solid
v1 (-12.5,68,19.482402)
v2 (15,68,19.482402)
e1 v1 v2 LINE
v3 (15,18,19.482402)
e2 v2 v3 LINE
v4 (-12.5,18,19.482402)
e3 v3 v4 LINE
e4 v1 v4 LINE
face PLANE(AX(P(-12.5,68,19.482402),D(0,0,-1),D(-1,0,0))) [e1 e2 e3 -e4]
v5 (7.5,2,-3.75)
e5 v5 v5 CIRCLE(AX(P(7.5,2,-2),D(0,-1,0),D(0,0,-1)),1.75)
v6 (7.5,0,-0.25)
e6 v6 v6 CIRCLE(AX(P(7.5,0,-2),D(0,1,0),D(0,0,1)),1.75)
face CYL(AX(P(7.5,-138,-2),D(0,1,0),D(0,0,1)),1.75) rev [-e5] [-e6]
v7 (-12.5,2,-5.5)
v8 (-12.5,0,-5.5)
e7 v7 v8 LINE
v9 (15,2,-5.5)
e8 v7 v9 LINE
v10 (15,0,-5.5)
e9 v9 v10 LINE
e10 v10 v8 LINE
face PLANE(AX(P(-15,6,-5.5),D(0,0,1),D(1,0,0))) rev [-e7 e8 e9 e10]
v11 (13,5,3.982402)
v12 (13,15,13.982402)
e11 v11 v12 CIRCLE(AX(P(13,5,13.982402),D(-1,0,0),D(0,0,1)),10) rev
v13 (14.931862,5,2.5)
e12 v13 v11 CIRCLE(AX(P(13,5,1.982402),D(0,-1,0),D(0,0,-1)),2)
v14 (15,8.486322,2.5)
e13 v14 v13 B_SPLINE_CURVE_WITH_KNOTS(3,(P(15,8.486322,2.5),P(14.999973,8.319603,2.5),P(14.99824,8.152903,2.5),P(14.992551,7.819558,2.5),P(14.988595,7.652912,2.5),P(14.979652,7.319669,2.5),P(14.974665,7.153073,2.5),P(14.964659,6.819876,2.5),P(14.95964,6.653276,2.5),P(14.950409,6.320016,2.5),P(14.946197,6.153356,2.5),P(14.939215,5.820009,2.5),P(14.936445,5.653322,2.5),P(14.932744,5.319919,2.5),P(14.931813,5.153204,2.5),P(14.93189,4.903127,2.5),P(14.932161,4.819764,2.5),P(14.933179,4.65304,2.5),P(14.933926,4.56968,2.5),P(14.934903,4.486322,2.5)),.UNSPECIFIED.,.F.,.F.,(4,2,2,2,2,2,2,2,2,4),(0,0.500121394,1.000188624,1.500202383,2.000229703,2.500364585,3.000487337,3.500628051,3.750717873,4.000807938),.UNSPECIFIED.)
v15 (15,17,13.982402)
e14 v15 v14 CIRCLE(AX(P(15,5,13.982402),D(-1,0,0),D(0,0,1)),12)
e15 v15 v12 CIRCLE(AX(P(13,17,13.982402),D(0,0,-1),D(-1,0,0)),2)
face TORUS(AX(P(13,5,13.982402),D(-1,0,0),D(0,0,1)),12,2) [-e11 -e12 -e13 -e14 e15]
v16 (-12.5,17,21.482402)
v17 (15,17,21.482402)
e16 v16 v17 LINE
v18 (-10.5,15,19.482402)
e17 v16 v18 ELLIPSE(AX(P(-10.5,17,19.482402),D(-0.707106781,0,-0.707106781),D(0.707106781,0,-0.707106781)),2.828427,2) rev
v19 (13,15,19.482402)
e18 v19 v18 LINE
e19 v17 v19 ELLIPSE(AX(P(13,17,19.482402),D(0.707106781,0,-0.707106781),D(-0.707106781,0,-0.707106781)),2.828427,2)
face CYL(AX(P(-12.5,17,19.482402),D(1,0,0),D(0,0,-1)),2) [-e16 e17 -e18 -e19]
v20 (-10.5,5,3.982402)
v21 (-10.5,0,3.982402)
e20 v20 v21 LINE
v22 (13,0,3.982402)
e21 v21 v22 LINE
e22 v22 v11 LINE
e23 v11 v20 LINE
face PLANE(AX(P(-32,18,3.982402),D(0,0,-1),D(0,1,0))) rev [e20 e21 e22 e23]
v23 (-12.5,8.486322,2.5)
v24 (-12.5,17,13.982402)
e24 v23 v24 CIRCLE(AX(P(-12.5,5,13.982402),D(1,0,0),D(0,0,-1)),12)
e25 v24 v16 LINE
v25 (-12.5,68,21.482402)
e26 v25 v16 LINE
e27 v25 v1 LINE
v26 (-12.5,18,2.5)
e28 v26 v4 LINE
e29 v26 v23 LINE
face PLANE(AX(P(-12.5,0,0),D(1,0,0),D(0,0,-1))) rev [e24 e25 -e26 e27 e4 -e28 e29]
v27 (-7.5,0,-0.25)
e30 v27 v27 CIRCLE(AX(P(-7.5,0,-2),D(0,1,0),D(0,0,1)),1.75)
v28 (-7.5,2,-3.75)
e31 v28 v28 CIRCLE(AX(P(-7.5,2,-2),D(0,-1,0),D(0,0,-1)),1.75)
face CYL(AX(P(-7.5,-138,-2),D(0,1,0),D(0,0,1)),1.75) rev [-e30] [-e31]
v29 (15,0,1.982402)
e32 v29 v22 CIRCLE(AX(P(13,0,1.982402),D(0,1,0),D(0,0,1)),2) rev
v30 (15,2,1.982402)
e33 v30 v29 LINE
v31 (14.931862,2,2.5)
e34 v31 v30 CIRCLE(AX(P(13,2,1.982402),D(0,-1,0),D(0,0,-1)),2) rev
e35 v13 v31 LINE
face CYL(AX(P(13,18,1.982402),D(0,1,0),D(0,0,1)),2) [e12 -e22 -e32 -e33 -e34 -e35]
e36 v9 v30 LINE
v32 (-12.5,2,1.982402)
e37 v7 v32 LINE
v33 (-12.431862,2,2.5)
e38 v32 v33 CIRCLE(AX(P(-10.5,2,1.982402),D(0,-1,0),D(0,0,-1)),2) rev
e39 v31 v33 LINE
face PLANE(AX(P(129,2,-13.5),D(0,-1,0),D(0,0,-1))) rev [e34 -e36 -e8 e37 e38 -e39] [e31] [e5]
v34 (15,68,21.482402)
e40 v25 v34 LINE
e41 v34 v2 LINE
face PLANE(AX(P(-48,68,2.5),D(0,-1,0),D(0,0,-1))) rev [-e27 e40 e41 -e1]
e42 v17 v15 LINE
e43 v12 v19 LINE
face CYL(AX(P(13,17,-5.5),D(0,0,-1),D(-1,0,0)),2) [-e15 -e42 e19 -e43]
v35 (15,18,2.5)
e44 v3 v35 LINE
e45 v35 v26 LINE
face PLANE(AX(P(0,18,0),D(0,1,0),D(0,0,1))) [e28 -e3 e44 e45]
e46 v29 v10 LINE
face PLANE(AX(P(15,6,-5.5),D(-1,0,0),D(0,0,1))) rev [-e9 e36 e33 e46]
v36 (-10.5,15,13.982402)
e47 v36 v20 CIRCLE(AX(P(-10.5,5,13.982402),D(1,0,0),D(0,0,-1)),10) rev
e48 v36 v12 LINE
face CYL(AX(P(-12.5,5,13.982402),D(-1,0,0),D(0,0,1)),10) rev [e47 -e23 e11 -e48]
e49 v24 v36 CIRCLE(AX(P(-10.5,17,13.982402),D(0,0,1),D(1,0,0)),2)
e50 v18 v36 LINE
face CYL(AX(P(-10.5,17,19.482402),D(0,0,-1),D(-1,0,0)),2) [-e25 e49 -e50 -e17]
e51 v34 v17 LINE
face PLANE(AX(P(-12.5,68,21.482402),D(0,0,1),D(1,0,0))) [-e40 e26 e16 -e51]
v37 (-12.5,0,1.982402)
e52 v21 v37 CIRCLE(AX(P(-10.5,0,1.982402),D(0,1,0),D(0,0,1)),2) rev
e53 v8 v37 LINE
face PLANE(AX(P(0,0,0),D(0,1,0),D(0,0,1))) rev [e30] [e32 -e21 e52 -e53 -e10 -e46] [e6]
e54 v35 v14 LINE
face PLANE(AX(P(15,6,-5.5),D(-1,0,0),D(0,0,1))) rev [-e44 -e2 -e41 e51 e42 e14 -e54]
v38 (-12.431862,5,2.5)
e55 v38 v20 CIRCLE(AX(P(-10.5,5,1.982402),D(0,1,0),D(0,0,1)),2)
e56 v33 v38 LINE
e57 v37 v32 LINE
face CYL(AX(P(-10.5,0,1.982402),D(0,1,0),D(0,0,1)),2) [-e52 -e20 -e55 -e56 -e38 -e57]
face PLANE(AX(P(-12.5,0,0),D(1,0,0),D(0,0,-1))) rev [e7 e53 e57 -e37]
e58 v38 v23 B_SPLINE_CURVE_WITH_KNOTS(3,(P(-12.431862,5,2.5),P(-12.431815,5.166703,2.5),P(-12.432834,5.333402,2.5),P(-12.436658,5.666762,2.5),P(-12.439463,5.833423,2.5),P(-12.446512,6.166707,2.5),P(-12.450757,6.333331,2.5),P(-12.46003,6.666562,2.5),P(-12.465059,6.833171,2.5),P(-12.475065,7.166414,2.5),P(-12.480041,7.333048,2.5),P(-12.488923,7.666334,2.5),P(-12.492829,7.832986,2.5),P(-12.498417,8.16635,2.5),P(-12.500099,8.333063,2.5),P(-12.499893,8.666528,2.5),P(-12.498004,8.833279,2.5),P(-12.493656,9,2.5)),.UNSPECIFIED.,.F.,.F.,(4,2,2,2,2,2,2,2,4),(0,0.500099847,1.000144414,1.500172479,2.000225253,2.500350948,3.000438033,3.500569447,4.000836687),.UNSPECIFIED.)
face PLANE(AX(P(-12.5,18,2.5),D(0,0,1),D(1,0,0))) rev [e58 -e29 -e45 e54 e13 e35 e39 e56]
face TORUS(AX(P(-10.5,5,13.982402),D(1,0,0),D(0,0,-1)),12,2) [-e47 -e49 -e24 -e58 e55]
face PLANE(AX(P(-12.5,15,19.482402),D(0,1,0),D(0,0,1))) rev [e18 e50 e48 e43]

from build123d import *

# Parameters (mm, degrees)
SKETCH_1_W           = 30
SKETCH_1_H           = 11
EXTRUDE_1_DEPTH      = 6
SKETCH_2_W           = 16
SKETCH_2_H           = 2
CUT_EXTRUDE_1_DEPTH  = 144
EXTRUDE_2_DEPTH      = 50
SKETCH_4_R           = 1.75
CUT_EXTRUDE_2_DEPTH  = 144
SKETCH_5_W           = 11
SKETCH_5_H           = 56
CUT_EXTRUDE_3_DEPTH  = 2.5
SKETCH_7_W           = 11
SKETCH_7_H           = 54
CUT_EXTRUDE_5_DEPTH  = 47
EXTRUDE_3_DEPTH      = 16
EXTRUDE_3_DEPTH_BACK = 2
SKETCH_8_W           = 27.5
SKETCH_8_H           = 1.482402205
SKETCH_9_W           = 27.5
SKETCH_9_H           = 3
EXTRUDE_4_DEPTH      = 16
SKETCH_10_W          = 3
SKETCH_10_H          = 18
CUT_EXTRUDE_6_DEPTH  = 47
SKETCH_12_W          = 27.5
SKETCH_12_H          = 3
EXTRUDE_5_DEPTH      = 15.5
SKETCH_13_W          = 27.5
SKETCH_13_H          = 2
EXTRUDE_6_DEPTH      = 53
SKETCH_14_W          = 27.5
SKETCH_14_H          = 18.982402205
EXTRUDE_7_DEPTH      = 3
SKETCH_15_W          = 27.5
SKETCH_15_H          = 2
EXTRUDE_8_DEPTH      = 13
SKETCH_16_W          = 27.5
SKETCH_16_H          = 10
EXTRUDE_9_DEPTH      = 2
CUT_EXTRUDE_START    = -6
SKETCH_17_R          = 1.75
CUT_EXTRUDE_8_DEPTH  = 6
FILLET_1_R           = 10
FILLET_2_R           = 2
CUT_EXTRUDE_9_DEPTH  = 63
SKETCH_19_W          = 18.982402205
SKETCH_19_H          = 16.821441914
CUT_EXTRUDE_10_DEPTH = 63


with BuildPart() as part:
    # 草图1 → 凸台-拉伸1 (new body)
    with BuildSketch(Plane(origin=(0, 0, 0), x_dir=(1, 0, 0), z_dir=(0, 1, 0))):
        Rectangle(SKETCH_1_W, SKETCH_1_H)
    extrude(amount=EXTRUDE_1_DEPTH)

    # 草图2 → 切除-拉伸1 (cut)
    with BuildSketch(Plane.ZY.offset(15)):
        with Locations((-5.5, 3)):
            Rectangle(SKETCH_2_W, SKETCH_2_H)
    extrude(amount=-CUT_EXTRUDE_1_DEPTH, mode=Mode.SUBTRACT)

    # 草图3 → 凸台-拉伸2 (add)
    with BuildSketch(Plane(origin=(0, 6, 0), x_dir=(1, 0, 0), z_dir=(0, 1, 0))):
        Polygon((2, 5.5), (-2, 5.5), (-2, -3.5), (-15, -3.5), (-15, -5.5), (15, -5.5), (15, -3.5), (2, -3.5), align=None)
    extrude(amount=EXTRUDE_2_DEPTH)

    # 草图4 → 切除-拉伸2 (cut)
    with BuildSketch(Plane(origin=(0, 6, 0), x_dir=(1, 0, 0), z_dir=(0, 1, 0))):
        with Locations(Location((-7.5, 2, 0), (0, 0, 270))):
            Circle(SKETCH_4_R)
        with Locations(Location((7.5, 2, 0), (0, 0, 270))):
            Circle(SKETCH_4_R)
    extrude(amount=-CUT_EXTRUDE_2_DEPTH, mode=Mode.SUBTRACT)

    # 草图5 → 切除-拉伸3 (cut)
    with BuildSketch(Plane.ZY.offset(15)):
        with Locations((0, 28)):
            Rectangle(SKETCH_5_W, SKETCH_5_H)
    extrude(amount=-CUT_EXTRUDE_3_DEPTH, mode=Mode.SUBTRACT)

    # 草图7 → 切除-拉伸5 (cut)
    with BuildSketch(Plane.ZY.offset(12.5)):
        with Locations((0, 29)):
            Rectangle(SKETCH_7_W, SKETCH_7_H)
    extrude(amount=-CUT_EXTRUDE_5_DEPTH, mode=Mode.SUBTRACT)

    # 草图8 → 凸台-拉伸3 (add, two sides: drawn at the far end of the back side and taken through both)
    with BuildSketch(Plane(origin=(0, 2, 0), x_dir=(1, 0, 0), z_dir=(0, 1, 0)).offset(-EXTRUDE_3_DEPTH_BACK)):
        with Locations((1.25, -6.241201102)):
            Rectangle(SKETCH_8_W, SKETCH_8_H)
    extrude(amount=EXTRUDE_3_DEPTH + EXTRUDE_3_DEPTH_BACK)

    # 草图9 → 凸台-拉伸4 (add)
    with BuildSketch(Plane(origin=(0, 2, 0), x_dir=(1, 0, 0), z_dir=(0, 1, 0))):
        with Locations((1.25, -4)):
            Rectangle(SKETCH_9_W, SKETCH_9_H)
    extrude(amount=EXTRUDE_4_DEPTH)

    # 草图10 → 切除-拉伸6 (cut)
    with BuildSketch(Plane(origin=(15, 0, 0), x_dir=(0, 0, -1), z_dir=(1, 0, 0))):
        with Locations((-5.482402205, 9)):
            Rectangle(SKETCH_10_W, SKETCH_10_H)
    extrude(amount=-CUT_EXTRUDE_6_DEPTH, mode=Mode.SUBTRACT)

    # 草图12 → 凸台-拉伸5 (add)
    with BuildSketch(Plane.XY.offset(3.982402205)):
        with Locations((1.25, 16.5)):
            Rectangle(SKETCH_12_W, SKETCH_12_H)
    extrude(amount=EXTRUDE_5_DEPTH)

    # 草图13 → 凸台-拉伸6 (add)
    with BuildSketch(Plane(origin=(0, 15, 0), x_dir=(-1, 0, 0), z_dir=(0, -1, 0))):
        with Locations((-1.25, -20.482402205)):
            Rectangle(SKETCH_13_W, SKETCH_13_H)
    extrude(amount=-EXTRUDE_6_DEPTH)

    # 草图14 → 凸台-拉伸7 (add)
    with BuildSketch(Plane(origin=(0, 68, 0), x_dir=(1, 0, 0), z_dir=(0, 1, 0))):
        with Locations((1.25, -11.991201102)):
            Rectangle(SKETCH_14_W, SKETCH_14_H)
    extrude(amount=EXTRUDE_7_DEPTH)

    # 草图15 → 凸台-拉伸8 (add)
    with BuildSketch(Plane(origin=(0, 71, 0), x_dir=(1, 0, 0), z_dir=(0, 1, 0))):
        with Locations((1.25, -3.5)):
            Rectangle(SKETCH_15_W, SKETCH_15_H)
    extrude(amount=EXTRUDE_8_DEPTH)

    # 草图16 → 凸台-拉伸9 (add)
    with BuildSketch(Plane(origin=(0, 84, 0), x_dir=(1, 0, 0), z_dir=(0, 1, 0))):
        with Locations((1.25, 0.5)):
            Rectangle(SKETCH_16_W, SKETCH_16_H)
    extrude(amount=EXTRUDE_9_DEPTH)

    # 草图17 → 切除-拉伸8 (cut)
    with BuildSketch(Plane(origin=(0, 84, 0), x_dir=(-1, 0, 0), z_dir=(0, -1, 0)).offset(CUT_EXTRUDE_START)):
        with Locations(Location((7.5, 2, 0), (0, 0, 270))):
            Circle(SKETCH_17_R)
        with Locations(Location((-7.5, 2, 0), (0, 0, 270))):
            Circle(SKETCH_17_R)
    extrude(amount=CUT_EXTRUDE_8_DEPTH, mode=Mode.SUBTRACT)

    # 圆角1
    fillet_1_edges = [part.edges().sort_by_distance(p)[0] for p in [
        (1.25, 15, 3.982402205),
        (1.25, 71, 4.5),
    ]]
    fillet(fillet_1_edges, radius=FILLET_1_R)

    # 圆角2
    # the kernel refuses this fillet: 2 mm, written as the material it takes off along each edge
    with BuildSketch(Plane(origin=(-12.5, -5, 3.982402205), x_dir=(1, 0, 0), z_dir=(0, 1, 0)), Plane(origin=(-12.5, 81, 4.5), x_dir=(1, 0, 0), z_dir=(0, 1, 0))) as fillet_2_piece_1:
        with BuildLine():
            CenterArc((FILLET_2_R, FILLET_2_R), FILLET_2_R, 180, 90)
            Line((0, FILLET_2_R), (0, 0))
            Line((0, 0), (FILLET_2_R, 0))
        make_face()
    extrude(amount=10, mode=Mode.SUBTRACT)
    with BuildSketch(Plane(origin=(15, 5, 3.982402205), x_dir=(0, 0, -1), z_dir=(0, -1, 0)), Plane(origin=(15, 91, 4.5), x_dir=(0, 0, -1), z_dir=(0, -1, 0))) as fillet_2_piece_2:
        with BuildLine():
            CenterArc((FILLET_2_R, -FILLET_2_R), FILLET_2_R, 90, 90)
            Line((0, -FILLET_2_R), (0, 0))
            Line((0, 0), (FILLET_2_R, 0))
        make_face()
    extrude(amount=10, mode=Mode.SUBTRACT)
    with BuildSketch(Plane(origin=(-12.5, 15, 13.982402205), x_dir=(1, 0, 0), z_dir=(0, 0, 1))) as fillet_2_piece_3:
        with BuildLine():
            CenterArc((FILLET_2_R, FILLET_2_R), FILLET_2_R, 180, 90)
            Line((0, FILLET_2_R), (0, 0))
            Line((0, 0), (FILLET_2_R, 0))
        make_face()
    extrude(amount=12.5, mode=Mode.SUBTRACT)
    with BuildSketch(Plane(origin=(15, 15, 26.482402205), x_dir=(0, 1, 0), z_dir=(0, 0, -1))) as fillet_2_piece_4:
        with BuildLine():
            CenterArc((FILLET_2_R, -FILLET_2_R), FILLET_2_R, 90, 90)
            Line((0, -FILLET_2_R), (0, 0))
            Line((0, 0), (FILLET_2_R, 0))
        make_face()
    extrude(amount=12.5, mode=Mode.SUBTRACT)
    with BuildSketch(Plane(origin=(20, 15, 21.482402205), x_dir=(0, 1, 0), z_dir=(-1, 0, 0))) as fillet_2_piece_5:
        with BuildLine():
            CenterArc((FILLET_2_R, FILLET_2_R), FILLET_2_R, 180, 90)
            Line((0, FILLET_2_R), (0, 0))
            Line((0, 0), (FILLET_2_R, 0))
        make_face()
    extrude(amount=37.5, mode=Mode.SUBTRACT)
    with BuildSketch(Plane(origin=(-17.5, 71, 21.482402205), x_dir=(0, 0, -1), z_dir=(1, 0, 0))) as fillet_2_piece_6:
        with BuildLine():
            CenterArc((FILLET_2_R, -FILLET_2_R), FILLET_2_R, 90, 90)
            Line((0, -FILLET_2_R), (0, 0))
            Line((0, 0), (FILLET_2_R, 0))
        make_face()
    extrude(amount=37.5, mode=Mode.SUBTRACT)
    with BuildSketch(Plane(origin=(15, 71, 26.482402205), x_dir=(0, -1, 0), z_dir=(0, 0, -1))) as fillet_2_piece_7:
        with BuildLine():
            CenterArc((FILLET_2_R, FILLET_2_R), FILLET_2_R, 180, 90)
            Line((0, FILLET_2_R), (0, 0))
            Line((0, 0), (FILLET_2_R, 0))
        make_face()
    extrude(amount=11.982402205, mode=Mode.SUBTRACT)
    with BuildSketch(Plane(origin=(-12.5, 71, 14.5), x_dir=(1, 0, 0), z_dir=(0, 0, 1))) as fillet_2_piece_8:
        with BuildLine():
            CenterArc((FILLET_2_R, -FILLET_2_R), FILLET_2_R, 90, 90)
            Line((0, -FILLET_2_R), (0, 0))
            Line((0, 0), (FILLET_2_R, 0))
        make_face()
    extrude(amount=11.982402205, mode=Mode.SUBTRACT)
    with BuildSketch(Plane(origin=(15, 81, 14.5), x_dir=(0, 0, -1), z_dir=(0, 1, 0))) as fillet_2_piece_9:
        with BuildLine():
            CenterArc((10 + FILLET_2_R, FILLET_2_R), FILLET_2_R, 180, 90)
            Line((10, FILLET_2_R), (10, 0))
            Line((10, 0), (10 + FILLET_2_R, 0))
        make_face()
    revolve(axis=Axis((15, 81, 14.5), (-1, 0, 0)), revolution_arc=90, mode=Mode.SUBTRACT)
    with BuildSketch(Plane(origin=(-12.5, 81, 14.5), x_dir=(0, 0, -1), z_dir=(0, 1, 0))) as fillet_2_piece_10:
        with BuildLine():
            CenterArc((10 + FILLET_2_R, -FILLET_2_R), FILLET_2_R, 90, 90)
            Line((10 + FILLET_2_R, 0), (10, 0))
            Line((10, 0), (10, -FILLET_2_R))
        make_face()
    revolve(axis=Axis((-12.5, 81, 14.5), (-1, 0, 0)), revolution_arc=90, mode=Mode.SUBTRACT)
    with BuildSketch(Plane(origin=(15, 5, 13.982402205), x_dir=(0, 0, -1), z_dir=(0, -1, 0))) as fillet_2_piece_11:
        with BuildLine():
            CenterArc((10 + FILLET_2_R, -FILLET_2_R), FILLET_2_R, 90, 90)
            Line((10, -FILLET_2_R), (10, 0))
            Line((10, 0), (10 + FILLET_2_R, 0))
        make_face()
    revolve(axis=Axis((15, 5, 13.982402205), (1, 0, 0)), revolution_arc=90, mode=Mode.SUBTRACT)
    with BuildSketch(Plane(origin=(-12.5, 5, 13.982402205), x_dir=(0, 0, -1), z_dir=(0, -1, 0))) as fillet_2_piece_12:
        with BuildLine():
            CenterArc((10 + FILLET_2_R, FILLET_2_R), FILLET_2_R, 180, 90)
            Line((10 + FILLET_2_R, 0), (10, 0))
            Line((10, 0), (10, FILLET_2_R))
        make_face()
    revolve(axis=Axis((-12.5, 5, 13.982402205), (1, 0, 0)), revolution_arc=90, mode=Mode.SUBTRACT)

    # 草图18 → 切除-拉伸9 (cut)
    with BuildSketch(Plane(origin=(15, 0, 0), x_dir=(0, 0, -1), z_dir=(1, 0, 0))):
        with BuildLine():
            Line((-2.5, 81), (-2.5, 68))
            Line((-2.5, 68), (12.398606428, 68))
            Line((12.398606428, 68), (12.398606428, 90.674751071))
            Line((12.398606428, 90.674751071), (-21.482402205, 90.674751071))
            Line((-21.482402205, 90.674751071), (-21.482402205, 69))
            Line((-21.482402205, 69), (-14.5, 69))
            ThreePointArc((-14.5, 69), (-6.014718626, 72.514718626), (-2.5, 81))
        make_face()
    extrude(amount=-CUT_EXTRUDE_9_DEPTH, mode=Mode.SUBTRACT)

    # 草图19 → 切除-拉伸10 (cut)
    with BuildSketch(Plane(origin=(15, 0, 0), x_dir=(0, 0, -1), z_dir=(1, 0, 0))):
        with Locations((-11.991201102, 76.410720957)):
            Rectangle(SKETCH_19_W, SKETCH_19_H)
    extrude(amount=-CUT_EXTRUDE_10_DEPTH, mode=Mode.SUBTRACT)


solid = part.part
